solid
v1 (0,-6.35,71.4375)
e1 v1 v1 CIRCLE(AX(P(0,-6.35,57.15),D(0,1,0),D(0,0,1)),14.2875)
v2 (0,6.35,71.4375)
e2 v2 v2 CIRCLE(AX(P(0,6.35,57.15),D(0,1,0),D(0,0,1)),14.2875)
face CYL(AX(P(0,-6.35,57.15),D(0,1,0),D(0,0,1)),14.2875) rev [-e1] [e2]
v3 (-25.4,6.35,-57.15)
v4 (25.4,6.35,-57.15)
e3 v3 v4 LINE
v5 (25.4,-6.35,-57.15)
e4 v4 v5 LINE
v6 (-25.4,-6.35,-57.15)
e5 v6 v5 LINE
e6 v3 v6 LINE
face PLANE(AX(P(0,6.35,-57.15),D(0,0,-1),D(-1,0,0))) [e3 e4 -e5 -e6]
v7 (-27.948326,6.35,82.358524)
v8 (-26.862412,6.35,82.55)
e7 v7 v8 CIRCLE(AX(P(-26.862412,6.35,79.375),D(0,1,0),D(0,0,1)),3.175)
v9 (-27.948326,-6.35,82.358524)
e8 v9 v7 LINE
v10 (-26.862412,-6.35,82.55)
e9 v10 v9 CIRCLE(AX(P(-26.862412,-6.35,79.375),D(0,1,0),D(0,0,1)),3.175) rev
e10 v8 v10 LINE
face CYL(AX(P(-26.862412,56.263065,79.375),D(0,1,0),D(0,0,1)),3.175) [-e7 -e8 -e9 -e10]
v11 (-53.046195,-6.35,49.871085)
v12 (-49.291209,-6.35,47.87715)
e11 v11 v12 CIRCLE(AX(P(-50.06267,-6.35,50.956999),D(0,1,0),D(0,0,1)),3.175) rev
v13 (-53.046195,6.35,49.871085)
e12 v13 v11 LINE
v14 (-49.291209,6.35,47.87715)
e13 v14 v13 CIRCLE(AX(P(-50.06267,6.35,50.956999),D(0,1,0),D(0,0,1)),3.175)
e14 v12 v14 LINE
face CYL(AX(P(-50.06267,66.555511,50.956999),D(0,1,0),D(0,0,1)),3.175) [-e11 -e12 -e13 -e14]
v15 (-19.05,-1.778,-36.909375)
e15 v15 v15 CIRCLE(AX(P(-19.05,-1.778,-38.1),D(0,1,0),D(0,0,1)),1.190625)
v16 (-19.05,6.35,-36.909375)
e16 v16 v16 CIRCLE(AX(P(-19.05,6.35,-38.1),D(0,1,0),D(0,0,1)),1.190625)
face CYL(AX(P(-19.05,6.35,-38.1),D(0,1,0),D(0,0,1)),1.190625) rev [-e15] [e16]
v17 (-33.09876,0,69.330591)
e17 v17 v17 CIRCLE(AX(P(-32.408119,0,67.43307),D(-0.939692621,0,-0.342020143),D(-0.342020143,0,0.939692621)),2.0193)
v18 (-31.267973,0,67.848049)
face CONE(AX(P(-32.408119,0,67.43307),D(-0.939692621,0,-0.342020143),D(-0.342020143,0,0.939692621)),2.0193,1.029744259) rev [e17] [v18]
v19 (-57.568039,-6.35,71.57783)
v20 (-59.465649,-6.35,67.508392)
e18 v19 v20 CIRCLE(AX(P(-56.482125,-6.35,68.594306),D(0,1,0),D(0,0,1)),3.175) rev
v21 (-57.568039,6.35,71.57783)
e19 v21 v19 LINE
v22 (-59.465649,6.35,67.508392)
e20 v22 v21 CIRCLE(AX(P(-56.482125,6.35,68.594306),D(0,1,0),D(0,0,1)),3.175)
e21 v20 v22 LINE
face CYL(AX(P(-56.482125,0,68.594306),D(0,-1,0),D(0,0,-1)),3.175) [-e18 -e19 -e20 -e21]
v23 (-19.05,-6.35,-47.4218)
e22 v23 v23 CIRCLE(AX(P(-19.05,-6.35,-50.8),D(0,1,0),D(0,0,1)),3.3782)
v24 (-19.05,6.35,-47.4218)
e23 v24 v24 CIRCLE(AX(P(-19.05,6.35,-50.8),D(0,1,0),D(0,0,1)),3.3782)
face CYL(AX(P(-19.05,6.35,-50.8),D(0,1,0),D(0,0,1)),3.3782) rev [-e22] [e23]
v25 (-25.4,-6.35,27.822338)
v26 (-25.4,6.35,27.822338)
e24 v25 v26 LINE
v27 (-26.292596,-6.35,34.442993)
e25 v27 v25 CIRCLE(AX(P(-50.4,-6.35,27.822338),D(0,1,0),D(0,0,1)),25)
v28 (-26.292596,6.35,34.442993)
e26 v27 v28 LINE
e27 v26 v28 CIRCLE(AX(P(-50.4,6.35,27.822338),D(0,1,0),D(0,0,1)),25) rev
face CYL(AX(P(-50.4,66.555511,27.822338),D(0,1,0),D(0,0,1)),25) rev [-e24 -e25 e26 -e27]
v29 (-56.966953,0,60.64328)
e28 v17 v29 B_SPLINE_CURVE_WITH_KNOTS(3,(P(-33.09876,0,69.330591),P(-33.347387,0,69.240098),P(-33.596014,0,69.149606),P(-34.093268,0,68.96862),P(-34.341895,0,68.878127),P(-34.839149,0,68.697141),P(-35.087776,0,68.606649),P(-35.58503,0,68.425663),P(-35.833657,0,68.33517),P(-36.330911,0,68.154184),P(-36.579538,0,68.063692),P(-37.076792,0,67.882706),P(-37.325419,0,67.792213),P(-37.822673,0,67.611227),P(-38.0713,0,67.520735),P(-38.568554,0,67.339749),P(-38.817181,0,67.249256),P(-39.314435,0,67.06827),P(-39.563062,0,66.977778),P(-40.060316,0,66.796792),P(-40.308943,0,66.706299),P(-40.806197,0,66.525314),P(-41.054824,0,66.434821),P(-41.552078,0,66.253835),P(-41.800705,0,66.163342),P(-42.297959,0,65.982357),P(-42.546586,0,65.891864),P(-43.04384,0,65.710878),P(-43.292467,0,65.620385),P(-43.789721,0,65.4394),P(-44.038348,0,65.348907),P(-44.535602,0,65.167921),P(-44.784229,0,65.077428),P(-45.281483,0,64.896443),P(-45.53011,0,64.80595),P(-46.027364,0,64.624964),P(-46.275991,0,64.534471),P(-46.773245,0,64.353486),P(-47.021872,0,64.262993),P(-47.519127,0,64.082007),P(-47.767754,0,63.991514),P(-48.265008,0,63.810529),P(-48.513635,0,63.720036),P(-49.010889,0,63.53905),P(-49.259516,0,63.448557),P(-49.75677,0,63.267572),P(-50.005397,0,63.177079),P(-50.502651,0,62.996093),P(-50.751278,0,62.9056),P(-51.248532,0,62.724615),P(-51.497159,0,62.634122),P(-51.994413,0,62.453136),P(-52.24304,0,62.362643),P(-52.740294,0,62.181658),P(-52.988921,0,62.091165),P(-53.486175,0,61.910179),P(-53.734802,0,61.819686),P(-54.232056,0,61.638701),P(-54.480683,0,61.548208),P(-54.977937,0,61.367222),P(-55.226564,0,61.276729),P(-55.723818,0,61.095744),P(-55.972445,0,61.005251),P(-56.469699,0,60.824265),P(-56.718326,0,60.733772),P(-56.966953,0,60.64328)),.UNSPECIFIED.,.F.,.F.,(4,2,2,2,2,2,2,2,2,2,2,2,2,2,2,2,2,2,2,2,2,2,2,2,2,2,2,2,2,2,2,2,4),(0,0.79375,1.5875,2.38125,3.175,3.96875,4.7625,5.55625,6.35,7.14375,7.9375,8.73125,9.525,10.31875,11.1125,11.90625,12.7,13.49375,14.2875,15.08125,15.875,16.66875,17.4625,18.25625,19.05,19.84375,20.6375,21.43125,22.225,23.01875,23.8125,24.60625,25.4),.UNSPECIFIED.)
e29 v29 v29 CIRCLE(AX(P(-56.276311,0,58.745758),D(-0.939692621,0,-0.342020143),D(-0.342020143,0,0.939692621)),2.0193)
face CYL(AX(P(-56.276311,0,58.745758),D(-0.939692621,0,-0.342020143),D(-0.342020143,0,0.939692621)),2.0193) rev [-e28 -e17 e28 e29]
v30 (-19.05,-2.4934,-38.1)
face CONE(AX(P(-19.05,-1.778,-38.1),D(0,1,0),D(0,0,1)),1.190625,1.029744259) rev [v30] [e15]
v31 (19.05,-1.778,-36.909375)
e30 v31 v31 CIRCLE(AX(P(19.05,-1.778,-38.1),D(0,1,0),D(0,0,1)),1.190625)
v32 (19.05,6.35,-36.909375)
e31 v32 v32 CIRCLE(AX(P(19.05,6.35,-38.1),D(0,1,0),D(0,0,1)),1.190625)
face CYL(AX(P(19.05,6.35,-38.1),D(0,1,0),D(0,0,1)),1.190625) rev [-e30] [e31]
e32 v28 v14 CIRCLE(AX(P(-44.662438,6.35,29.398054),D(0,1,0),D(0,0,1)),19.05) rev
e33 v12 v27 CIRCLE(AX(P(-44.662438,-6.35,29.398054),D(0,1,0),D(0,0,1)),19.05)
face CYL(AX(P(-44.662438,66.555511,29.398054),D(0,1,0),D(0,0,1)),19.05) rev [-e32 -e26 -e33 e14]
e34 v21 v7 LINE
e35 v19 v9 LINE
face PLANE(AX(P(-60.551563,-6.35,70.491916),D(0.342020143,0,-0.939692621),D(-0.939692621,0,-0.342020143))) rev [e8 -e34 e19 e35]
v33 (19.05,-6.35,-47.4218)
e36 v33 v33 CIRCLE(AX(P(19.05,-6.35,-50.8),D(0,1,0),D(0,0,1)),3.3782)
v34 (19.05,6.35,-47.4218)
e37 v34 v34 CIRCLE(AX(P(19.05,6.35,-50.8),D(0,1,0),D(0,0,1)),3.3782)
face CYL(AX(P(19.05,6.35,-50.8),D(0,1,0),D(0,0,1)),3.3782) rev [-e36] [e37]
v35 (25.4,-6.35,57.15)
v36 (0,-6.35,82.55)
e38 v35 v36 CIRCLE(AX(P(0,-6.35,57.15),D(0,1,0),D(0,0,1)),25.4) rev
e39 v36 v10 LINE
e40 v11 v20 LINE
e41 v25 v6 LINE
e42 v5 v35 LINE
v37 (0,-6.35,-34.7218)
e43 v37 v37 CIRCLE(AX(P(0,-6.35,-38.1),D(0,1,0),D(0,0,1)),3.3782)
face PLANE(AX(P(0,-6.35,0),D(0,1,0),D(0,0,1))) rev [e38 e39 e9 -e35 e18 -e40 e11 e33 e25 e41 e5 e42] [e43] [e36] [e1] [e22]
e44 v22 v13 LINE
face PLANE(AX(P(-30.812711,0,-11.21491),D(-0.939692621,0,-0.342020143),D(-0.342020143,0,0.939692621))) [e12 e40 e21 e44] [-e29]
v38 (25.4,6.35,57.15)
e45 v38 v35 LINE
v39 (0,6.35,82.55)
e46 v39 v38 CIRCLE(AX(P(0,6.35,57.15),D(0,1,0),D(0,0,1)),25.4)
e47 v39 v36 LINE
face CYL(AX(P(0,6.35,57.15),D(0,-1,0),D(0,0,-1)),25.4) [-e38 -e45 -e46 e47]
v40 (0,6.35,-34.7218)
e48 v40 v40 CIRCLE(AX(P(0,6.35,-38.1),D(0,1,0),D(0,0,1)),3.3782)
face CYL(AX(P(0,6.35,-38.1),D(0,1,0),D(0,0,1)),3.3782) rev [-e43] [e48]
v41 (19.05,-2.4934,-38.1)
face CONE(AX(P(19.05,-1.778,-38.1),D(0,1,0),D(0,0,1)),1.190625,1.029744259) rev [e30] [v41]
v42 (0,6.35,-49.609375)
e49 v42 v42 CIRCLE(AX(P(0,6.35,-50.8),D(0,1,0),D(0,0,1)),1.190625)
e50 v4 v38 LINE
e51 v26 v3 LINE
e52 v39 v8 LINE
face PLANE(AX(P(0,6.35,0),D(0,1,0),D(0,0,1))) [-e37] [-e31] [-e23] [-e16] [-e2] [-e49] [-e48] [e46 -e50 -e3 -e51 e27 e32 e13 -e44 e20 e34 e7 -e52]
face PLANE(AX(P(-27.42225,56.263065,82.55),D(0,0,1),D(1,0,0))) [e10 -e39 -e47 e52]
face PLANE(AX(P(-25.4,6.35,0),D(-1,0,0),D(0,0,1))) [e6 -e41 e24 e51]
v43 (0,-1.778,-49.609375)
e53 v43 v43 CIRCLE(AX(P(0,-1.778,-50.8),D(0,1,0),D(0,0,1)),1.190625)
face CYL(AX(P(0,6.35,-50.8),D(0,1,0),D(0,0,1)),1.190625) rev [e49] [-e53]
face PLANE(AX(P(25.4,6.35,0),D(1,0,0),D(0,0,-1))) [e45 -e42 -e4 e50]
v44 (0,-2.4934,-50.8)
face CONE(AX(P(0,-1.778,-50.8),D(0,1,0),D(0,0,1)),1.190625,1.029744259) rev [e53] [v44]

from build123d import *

# Parameters (mm, degrees)
BOSS_EXTRUDE1_DEPTH              = 6.35
FILLET1_R                        = 25.4
SKETCH11_R                       = 14.2875
CUT_EXTRUDE1_DEPTH               = 88.298066989
F_1_4_CLEARANCE_HOLE1_D          = 6.7564
BOSS_EXTRUDE2_DEPTH              = 12.7
FILLET2_R                        = 25
SKETCH25_W                       = 25
SKETCH25_H                       = 12.7
BOSS_EXTRUDE3_DEPTH              = 12
TAP_DRILL_FOR_10_32_TAP1_D       = 4.0386
TAP_DRILL_FOR_10_32_TAP1_DEPTH   = 25.4
TAP_DRILL_FOR_10_32_TAP1_TIP     = 1.213317848
FILLET4_R                        = 19.05
BOSS_EXTRUDE4_DEPTH              = 12.7
FILLET3_R                        = 3.175
F_3_32_0_09375_DOWEL_HOLE2_D     = 2.38125
F_3_32_0_09375_DOWEL_HOLE2_DEPTH = 8.128
F_3_32_0_09375_DOWEL_HOLE2_TIP   = 0.715399675


with BuildPart() as part:
    # Sketch2 → Boss-Extrude1 (new, symmetric)
    with BuildSketch(Plane(origin=(0, 0, 0), x_dir=(1, 0, 0), z_dir=(0, 1, 0))):
        Polygon((25.4, -82.55), (25.4, 0), (25.4, 57.15), (-25.4, 57.15), (-25.4, 0), (-25.4, -82.55), align=None)
    extrude(amount=BOSS_EXTRUDE1_DEPTH, both=True)

    # Fillet1
    fillet1_edges = [part.edges().sort_by_distance(p)[0] for p in [
        (25.4, 0, 82.55),
        (-25.4, 0, 82.55),
    ]]
    fillet(fillet1_edges, radius=FILLET1_R - 0.0001)  # a hair under: the kernel refuses the full size

    # Sketch11 → Cut-Extrude1 (cut, through all)
    with BuildSketch(Plane(origin=(0, 6.35, 0), x_dir=(1, 0, 0), z_dir=(0, 1, 0))):
        with Locations(Location((0, -57.15, 0), (0, 0, 270))):
            Circle(SKETCH11_R)
    extrude(amount=-CUT_EXTRUDE1_DEPTH, mode=Mode.SUBTRACT)

    # 1/4 Clearance Hole1 (through all)
    with Locations(Plane(origin=(0, 6.35, 0), x_dir=(1, 0, 0), z_dir=(0, 1, 0))):
        with Locations((-19.05, 50.8), (19.05, 50.8), (0, 38.1)):
            Hole(F_1_4_CLEARANCE_HOLE1_D / 2)

    # Sketch15 → Boss-Extrude2 (add)
    with BuildSketch(Plane.XZ.offset(6.35)):
        with BuildLine():
            Line((-4.225282002, 82.196097341), (-49.275251792, 74.59615776))
            Line((-49.275251792, 74.59615776), (-40.724748208, 51.10384224))
            Line((-40.724748208, 51.10384224), (-25.4, 42.256094737))
            Line((-25.4, 42.256094737), (-25.4, 57.15))
            ThreePointArc((-25.4, 57.15), (-19.396934846, 73.54874747), (-4.225282002, 82.196097341))
        make_face()
    extrude(amount=-BOSS_EXTRUDE2_DEPTH)

    # Fillet2
    fillet2_edges = [part.edges().sort_by_distance(p)[0] for p in [
        (-25.4, 0, 42.256094737),
    ]]
    fillet(fillet2_edges, radius=FILLET2_R)

    # Sketch25 → Boss-Extrude3 (add)
    with BuildSketch(Plane(origin=(-19.536399336, 0, -7.110667843), x_dir=(-0.34202014332566627, 0, 0.9396926207859093), z_dir=(-0.9396926207859093, 0, -0.34202014332566627))):
        with Locations((74.450587666, 0)):
            Rectangle(SKETCH25_W, SKETCH25_H)
    extrude(amount=BOSS_EXTRUDE3_DEPTH)

    # Tap Drill for #10-32 Tap1
    with Locations(Plane(origin=(-30.812710785, 0, -11.214909563), x_dir=(-0.3420201433256665, 0, 0.9396926207859093), z_dir=(-0.9396926207859092, 0, -0.34202014332566644))):
        with Locations((74.450587666, 0)):
            Hole(TAP_DRILL_FOR_10_32_TAP1_D / 2, depth=TAP_DRILL_FOR_10_32_TAP1_DEPTH)
            with Locations((0, 0, -(TAP_DRILL_FOR_10_32_TAP1_DEPTH + TAP_DRILL_FOR_10_32_TAP1_TIP / 2))):  # 118° drill point
                Cone(0, TAP_DRILL_FOR_10_32_TAP1_D / 2, TAP_DRILL_FOR_10_32_TAP1_TIP, mode=Mode.SUBTRACT)

    # Fillet4
    fillet4_edges = [part.edges().sort_by_distance(p)[0] for p in [
        (-40.724748208, 0, 51.10384224),
    ]]
    fillet(fillet4_edges, radius=FILLET4_R)

    # Sketch26 → Boss-Extrude4 (add)
    with BuildSketch(Plane.XZ.offset(6.35)):
        Polygon((-27.422249839, 82.55), (0, 82.55), (-49.275251792, 74.59615776), align=None)
    extrude(amount=-BOSS_EXTRUDE4_DEPTH)

    # Fillet3
    fillet3_edges = [part.edges().sort_by_distance(p)[0] for p in [
        (-60.551563241, 0, 70.49191604),
        (-52.001059658, 0, 46.99960052),
        (-27.422249839, 0, 82.55),
    ]]
    fillet(fillet3_edges, radius=FILLET3_R)

    # 3/32 (0.09375) Dowel Hole2
    with Locations(Plane(origin=(0, 6.35, 0), x_dir=(1, 0, 0), z_dir=(0, 1, 0))):
        with Locations((19.05, 38.1), (0, 50.8), (-19.05, 38.1), (0, 38.1)):
            Hole(F_3_32_0_09375_DOWEL_HOLE2_D / 2, depth=F_3_32_0_09375_DOWEL_HOLE2_DEPTH)
            with Locations((0, 0, -(F_3_32_0_09375_DOWEL_HOLE2_DEPTH + F_3_32_0_09375_DOWEL_HOLE2_TIP / 2))):  # 118° drill point
                Cone(0, F_3_32_0_09375_DOWEL_HOLE2_D / 2, F_3_32_0_09375_DOWEL_HOLE2_TIP, mode=Mode.SUBTRACT)


solid = part.part
